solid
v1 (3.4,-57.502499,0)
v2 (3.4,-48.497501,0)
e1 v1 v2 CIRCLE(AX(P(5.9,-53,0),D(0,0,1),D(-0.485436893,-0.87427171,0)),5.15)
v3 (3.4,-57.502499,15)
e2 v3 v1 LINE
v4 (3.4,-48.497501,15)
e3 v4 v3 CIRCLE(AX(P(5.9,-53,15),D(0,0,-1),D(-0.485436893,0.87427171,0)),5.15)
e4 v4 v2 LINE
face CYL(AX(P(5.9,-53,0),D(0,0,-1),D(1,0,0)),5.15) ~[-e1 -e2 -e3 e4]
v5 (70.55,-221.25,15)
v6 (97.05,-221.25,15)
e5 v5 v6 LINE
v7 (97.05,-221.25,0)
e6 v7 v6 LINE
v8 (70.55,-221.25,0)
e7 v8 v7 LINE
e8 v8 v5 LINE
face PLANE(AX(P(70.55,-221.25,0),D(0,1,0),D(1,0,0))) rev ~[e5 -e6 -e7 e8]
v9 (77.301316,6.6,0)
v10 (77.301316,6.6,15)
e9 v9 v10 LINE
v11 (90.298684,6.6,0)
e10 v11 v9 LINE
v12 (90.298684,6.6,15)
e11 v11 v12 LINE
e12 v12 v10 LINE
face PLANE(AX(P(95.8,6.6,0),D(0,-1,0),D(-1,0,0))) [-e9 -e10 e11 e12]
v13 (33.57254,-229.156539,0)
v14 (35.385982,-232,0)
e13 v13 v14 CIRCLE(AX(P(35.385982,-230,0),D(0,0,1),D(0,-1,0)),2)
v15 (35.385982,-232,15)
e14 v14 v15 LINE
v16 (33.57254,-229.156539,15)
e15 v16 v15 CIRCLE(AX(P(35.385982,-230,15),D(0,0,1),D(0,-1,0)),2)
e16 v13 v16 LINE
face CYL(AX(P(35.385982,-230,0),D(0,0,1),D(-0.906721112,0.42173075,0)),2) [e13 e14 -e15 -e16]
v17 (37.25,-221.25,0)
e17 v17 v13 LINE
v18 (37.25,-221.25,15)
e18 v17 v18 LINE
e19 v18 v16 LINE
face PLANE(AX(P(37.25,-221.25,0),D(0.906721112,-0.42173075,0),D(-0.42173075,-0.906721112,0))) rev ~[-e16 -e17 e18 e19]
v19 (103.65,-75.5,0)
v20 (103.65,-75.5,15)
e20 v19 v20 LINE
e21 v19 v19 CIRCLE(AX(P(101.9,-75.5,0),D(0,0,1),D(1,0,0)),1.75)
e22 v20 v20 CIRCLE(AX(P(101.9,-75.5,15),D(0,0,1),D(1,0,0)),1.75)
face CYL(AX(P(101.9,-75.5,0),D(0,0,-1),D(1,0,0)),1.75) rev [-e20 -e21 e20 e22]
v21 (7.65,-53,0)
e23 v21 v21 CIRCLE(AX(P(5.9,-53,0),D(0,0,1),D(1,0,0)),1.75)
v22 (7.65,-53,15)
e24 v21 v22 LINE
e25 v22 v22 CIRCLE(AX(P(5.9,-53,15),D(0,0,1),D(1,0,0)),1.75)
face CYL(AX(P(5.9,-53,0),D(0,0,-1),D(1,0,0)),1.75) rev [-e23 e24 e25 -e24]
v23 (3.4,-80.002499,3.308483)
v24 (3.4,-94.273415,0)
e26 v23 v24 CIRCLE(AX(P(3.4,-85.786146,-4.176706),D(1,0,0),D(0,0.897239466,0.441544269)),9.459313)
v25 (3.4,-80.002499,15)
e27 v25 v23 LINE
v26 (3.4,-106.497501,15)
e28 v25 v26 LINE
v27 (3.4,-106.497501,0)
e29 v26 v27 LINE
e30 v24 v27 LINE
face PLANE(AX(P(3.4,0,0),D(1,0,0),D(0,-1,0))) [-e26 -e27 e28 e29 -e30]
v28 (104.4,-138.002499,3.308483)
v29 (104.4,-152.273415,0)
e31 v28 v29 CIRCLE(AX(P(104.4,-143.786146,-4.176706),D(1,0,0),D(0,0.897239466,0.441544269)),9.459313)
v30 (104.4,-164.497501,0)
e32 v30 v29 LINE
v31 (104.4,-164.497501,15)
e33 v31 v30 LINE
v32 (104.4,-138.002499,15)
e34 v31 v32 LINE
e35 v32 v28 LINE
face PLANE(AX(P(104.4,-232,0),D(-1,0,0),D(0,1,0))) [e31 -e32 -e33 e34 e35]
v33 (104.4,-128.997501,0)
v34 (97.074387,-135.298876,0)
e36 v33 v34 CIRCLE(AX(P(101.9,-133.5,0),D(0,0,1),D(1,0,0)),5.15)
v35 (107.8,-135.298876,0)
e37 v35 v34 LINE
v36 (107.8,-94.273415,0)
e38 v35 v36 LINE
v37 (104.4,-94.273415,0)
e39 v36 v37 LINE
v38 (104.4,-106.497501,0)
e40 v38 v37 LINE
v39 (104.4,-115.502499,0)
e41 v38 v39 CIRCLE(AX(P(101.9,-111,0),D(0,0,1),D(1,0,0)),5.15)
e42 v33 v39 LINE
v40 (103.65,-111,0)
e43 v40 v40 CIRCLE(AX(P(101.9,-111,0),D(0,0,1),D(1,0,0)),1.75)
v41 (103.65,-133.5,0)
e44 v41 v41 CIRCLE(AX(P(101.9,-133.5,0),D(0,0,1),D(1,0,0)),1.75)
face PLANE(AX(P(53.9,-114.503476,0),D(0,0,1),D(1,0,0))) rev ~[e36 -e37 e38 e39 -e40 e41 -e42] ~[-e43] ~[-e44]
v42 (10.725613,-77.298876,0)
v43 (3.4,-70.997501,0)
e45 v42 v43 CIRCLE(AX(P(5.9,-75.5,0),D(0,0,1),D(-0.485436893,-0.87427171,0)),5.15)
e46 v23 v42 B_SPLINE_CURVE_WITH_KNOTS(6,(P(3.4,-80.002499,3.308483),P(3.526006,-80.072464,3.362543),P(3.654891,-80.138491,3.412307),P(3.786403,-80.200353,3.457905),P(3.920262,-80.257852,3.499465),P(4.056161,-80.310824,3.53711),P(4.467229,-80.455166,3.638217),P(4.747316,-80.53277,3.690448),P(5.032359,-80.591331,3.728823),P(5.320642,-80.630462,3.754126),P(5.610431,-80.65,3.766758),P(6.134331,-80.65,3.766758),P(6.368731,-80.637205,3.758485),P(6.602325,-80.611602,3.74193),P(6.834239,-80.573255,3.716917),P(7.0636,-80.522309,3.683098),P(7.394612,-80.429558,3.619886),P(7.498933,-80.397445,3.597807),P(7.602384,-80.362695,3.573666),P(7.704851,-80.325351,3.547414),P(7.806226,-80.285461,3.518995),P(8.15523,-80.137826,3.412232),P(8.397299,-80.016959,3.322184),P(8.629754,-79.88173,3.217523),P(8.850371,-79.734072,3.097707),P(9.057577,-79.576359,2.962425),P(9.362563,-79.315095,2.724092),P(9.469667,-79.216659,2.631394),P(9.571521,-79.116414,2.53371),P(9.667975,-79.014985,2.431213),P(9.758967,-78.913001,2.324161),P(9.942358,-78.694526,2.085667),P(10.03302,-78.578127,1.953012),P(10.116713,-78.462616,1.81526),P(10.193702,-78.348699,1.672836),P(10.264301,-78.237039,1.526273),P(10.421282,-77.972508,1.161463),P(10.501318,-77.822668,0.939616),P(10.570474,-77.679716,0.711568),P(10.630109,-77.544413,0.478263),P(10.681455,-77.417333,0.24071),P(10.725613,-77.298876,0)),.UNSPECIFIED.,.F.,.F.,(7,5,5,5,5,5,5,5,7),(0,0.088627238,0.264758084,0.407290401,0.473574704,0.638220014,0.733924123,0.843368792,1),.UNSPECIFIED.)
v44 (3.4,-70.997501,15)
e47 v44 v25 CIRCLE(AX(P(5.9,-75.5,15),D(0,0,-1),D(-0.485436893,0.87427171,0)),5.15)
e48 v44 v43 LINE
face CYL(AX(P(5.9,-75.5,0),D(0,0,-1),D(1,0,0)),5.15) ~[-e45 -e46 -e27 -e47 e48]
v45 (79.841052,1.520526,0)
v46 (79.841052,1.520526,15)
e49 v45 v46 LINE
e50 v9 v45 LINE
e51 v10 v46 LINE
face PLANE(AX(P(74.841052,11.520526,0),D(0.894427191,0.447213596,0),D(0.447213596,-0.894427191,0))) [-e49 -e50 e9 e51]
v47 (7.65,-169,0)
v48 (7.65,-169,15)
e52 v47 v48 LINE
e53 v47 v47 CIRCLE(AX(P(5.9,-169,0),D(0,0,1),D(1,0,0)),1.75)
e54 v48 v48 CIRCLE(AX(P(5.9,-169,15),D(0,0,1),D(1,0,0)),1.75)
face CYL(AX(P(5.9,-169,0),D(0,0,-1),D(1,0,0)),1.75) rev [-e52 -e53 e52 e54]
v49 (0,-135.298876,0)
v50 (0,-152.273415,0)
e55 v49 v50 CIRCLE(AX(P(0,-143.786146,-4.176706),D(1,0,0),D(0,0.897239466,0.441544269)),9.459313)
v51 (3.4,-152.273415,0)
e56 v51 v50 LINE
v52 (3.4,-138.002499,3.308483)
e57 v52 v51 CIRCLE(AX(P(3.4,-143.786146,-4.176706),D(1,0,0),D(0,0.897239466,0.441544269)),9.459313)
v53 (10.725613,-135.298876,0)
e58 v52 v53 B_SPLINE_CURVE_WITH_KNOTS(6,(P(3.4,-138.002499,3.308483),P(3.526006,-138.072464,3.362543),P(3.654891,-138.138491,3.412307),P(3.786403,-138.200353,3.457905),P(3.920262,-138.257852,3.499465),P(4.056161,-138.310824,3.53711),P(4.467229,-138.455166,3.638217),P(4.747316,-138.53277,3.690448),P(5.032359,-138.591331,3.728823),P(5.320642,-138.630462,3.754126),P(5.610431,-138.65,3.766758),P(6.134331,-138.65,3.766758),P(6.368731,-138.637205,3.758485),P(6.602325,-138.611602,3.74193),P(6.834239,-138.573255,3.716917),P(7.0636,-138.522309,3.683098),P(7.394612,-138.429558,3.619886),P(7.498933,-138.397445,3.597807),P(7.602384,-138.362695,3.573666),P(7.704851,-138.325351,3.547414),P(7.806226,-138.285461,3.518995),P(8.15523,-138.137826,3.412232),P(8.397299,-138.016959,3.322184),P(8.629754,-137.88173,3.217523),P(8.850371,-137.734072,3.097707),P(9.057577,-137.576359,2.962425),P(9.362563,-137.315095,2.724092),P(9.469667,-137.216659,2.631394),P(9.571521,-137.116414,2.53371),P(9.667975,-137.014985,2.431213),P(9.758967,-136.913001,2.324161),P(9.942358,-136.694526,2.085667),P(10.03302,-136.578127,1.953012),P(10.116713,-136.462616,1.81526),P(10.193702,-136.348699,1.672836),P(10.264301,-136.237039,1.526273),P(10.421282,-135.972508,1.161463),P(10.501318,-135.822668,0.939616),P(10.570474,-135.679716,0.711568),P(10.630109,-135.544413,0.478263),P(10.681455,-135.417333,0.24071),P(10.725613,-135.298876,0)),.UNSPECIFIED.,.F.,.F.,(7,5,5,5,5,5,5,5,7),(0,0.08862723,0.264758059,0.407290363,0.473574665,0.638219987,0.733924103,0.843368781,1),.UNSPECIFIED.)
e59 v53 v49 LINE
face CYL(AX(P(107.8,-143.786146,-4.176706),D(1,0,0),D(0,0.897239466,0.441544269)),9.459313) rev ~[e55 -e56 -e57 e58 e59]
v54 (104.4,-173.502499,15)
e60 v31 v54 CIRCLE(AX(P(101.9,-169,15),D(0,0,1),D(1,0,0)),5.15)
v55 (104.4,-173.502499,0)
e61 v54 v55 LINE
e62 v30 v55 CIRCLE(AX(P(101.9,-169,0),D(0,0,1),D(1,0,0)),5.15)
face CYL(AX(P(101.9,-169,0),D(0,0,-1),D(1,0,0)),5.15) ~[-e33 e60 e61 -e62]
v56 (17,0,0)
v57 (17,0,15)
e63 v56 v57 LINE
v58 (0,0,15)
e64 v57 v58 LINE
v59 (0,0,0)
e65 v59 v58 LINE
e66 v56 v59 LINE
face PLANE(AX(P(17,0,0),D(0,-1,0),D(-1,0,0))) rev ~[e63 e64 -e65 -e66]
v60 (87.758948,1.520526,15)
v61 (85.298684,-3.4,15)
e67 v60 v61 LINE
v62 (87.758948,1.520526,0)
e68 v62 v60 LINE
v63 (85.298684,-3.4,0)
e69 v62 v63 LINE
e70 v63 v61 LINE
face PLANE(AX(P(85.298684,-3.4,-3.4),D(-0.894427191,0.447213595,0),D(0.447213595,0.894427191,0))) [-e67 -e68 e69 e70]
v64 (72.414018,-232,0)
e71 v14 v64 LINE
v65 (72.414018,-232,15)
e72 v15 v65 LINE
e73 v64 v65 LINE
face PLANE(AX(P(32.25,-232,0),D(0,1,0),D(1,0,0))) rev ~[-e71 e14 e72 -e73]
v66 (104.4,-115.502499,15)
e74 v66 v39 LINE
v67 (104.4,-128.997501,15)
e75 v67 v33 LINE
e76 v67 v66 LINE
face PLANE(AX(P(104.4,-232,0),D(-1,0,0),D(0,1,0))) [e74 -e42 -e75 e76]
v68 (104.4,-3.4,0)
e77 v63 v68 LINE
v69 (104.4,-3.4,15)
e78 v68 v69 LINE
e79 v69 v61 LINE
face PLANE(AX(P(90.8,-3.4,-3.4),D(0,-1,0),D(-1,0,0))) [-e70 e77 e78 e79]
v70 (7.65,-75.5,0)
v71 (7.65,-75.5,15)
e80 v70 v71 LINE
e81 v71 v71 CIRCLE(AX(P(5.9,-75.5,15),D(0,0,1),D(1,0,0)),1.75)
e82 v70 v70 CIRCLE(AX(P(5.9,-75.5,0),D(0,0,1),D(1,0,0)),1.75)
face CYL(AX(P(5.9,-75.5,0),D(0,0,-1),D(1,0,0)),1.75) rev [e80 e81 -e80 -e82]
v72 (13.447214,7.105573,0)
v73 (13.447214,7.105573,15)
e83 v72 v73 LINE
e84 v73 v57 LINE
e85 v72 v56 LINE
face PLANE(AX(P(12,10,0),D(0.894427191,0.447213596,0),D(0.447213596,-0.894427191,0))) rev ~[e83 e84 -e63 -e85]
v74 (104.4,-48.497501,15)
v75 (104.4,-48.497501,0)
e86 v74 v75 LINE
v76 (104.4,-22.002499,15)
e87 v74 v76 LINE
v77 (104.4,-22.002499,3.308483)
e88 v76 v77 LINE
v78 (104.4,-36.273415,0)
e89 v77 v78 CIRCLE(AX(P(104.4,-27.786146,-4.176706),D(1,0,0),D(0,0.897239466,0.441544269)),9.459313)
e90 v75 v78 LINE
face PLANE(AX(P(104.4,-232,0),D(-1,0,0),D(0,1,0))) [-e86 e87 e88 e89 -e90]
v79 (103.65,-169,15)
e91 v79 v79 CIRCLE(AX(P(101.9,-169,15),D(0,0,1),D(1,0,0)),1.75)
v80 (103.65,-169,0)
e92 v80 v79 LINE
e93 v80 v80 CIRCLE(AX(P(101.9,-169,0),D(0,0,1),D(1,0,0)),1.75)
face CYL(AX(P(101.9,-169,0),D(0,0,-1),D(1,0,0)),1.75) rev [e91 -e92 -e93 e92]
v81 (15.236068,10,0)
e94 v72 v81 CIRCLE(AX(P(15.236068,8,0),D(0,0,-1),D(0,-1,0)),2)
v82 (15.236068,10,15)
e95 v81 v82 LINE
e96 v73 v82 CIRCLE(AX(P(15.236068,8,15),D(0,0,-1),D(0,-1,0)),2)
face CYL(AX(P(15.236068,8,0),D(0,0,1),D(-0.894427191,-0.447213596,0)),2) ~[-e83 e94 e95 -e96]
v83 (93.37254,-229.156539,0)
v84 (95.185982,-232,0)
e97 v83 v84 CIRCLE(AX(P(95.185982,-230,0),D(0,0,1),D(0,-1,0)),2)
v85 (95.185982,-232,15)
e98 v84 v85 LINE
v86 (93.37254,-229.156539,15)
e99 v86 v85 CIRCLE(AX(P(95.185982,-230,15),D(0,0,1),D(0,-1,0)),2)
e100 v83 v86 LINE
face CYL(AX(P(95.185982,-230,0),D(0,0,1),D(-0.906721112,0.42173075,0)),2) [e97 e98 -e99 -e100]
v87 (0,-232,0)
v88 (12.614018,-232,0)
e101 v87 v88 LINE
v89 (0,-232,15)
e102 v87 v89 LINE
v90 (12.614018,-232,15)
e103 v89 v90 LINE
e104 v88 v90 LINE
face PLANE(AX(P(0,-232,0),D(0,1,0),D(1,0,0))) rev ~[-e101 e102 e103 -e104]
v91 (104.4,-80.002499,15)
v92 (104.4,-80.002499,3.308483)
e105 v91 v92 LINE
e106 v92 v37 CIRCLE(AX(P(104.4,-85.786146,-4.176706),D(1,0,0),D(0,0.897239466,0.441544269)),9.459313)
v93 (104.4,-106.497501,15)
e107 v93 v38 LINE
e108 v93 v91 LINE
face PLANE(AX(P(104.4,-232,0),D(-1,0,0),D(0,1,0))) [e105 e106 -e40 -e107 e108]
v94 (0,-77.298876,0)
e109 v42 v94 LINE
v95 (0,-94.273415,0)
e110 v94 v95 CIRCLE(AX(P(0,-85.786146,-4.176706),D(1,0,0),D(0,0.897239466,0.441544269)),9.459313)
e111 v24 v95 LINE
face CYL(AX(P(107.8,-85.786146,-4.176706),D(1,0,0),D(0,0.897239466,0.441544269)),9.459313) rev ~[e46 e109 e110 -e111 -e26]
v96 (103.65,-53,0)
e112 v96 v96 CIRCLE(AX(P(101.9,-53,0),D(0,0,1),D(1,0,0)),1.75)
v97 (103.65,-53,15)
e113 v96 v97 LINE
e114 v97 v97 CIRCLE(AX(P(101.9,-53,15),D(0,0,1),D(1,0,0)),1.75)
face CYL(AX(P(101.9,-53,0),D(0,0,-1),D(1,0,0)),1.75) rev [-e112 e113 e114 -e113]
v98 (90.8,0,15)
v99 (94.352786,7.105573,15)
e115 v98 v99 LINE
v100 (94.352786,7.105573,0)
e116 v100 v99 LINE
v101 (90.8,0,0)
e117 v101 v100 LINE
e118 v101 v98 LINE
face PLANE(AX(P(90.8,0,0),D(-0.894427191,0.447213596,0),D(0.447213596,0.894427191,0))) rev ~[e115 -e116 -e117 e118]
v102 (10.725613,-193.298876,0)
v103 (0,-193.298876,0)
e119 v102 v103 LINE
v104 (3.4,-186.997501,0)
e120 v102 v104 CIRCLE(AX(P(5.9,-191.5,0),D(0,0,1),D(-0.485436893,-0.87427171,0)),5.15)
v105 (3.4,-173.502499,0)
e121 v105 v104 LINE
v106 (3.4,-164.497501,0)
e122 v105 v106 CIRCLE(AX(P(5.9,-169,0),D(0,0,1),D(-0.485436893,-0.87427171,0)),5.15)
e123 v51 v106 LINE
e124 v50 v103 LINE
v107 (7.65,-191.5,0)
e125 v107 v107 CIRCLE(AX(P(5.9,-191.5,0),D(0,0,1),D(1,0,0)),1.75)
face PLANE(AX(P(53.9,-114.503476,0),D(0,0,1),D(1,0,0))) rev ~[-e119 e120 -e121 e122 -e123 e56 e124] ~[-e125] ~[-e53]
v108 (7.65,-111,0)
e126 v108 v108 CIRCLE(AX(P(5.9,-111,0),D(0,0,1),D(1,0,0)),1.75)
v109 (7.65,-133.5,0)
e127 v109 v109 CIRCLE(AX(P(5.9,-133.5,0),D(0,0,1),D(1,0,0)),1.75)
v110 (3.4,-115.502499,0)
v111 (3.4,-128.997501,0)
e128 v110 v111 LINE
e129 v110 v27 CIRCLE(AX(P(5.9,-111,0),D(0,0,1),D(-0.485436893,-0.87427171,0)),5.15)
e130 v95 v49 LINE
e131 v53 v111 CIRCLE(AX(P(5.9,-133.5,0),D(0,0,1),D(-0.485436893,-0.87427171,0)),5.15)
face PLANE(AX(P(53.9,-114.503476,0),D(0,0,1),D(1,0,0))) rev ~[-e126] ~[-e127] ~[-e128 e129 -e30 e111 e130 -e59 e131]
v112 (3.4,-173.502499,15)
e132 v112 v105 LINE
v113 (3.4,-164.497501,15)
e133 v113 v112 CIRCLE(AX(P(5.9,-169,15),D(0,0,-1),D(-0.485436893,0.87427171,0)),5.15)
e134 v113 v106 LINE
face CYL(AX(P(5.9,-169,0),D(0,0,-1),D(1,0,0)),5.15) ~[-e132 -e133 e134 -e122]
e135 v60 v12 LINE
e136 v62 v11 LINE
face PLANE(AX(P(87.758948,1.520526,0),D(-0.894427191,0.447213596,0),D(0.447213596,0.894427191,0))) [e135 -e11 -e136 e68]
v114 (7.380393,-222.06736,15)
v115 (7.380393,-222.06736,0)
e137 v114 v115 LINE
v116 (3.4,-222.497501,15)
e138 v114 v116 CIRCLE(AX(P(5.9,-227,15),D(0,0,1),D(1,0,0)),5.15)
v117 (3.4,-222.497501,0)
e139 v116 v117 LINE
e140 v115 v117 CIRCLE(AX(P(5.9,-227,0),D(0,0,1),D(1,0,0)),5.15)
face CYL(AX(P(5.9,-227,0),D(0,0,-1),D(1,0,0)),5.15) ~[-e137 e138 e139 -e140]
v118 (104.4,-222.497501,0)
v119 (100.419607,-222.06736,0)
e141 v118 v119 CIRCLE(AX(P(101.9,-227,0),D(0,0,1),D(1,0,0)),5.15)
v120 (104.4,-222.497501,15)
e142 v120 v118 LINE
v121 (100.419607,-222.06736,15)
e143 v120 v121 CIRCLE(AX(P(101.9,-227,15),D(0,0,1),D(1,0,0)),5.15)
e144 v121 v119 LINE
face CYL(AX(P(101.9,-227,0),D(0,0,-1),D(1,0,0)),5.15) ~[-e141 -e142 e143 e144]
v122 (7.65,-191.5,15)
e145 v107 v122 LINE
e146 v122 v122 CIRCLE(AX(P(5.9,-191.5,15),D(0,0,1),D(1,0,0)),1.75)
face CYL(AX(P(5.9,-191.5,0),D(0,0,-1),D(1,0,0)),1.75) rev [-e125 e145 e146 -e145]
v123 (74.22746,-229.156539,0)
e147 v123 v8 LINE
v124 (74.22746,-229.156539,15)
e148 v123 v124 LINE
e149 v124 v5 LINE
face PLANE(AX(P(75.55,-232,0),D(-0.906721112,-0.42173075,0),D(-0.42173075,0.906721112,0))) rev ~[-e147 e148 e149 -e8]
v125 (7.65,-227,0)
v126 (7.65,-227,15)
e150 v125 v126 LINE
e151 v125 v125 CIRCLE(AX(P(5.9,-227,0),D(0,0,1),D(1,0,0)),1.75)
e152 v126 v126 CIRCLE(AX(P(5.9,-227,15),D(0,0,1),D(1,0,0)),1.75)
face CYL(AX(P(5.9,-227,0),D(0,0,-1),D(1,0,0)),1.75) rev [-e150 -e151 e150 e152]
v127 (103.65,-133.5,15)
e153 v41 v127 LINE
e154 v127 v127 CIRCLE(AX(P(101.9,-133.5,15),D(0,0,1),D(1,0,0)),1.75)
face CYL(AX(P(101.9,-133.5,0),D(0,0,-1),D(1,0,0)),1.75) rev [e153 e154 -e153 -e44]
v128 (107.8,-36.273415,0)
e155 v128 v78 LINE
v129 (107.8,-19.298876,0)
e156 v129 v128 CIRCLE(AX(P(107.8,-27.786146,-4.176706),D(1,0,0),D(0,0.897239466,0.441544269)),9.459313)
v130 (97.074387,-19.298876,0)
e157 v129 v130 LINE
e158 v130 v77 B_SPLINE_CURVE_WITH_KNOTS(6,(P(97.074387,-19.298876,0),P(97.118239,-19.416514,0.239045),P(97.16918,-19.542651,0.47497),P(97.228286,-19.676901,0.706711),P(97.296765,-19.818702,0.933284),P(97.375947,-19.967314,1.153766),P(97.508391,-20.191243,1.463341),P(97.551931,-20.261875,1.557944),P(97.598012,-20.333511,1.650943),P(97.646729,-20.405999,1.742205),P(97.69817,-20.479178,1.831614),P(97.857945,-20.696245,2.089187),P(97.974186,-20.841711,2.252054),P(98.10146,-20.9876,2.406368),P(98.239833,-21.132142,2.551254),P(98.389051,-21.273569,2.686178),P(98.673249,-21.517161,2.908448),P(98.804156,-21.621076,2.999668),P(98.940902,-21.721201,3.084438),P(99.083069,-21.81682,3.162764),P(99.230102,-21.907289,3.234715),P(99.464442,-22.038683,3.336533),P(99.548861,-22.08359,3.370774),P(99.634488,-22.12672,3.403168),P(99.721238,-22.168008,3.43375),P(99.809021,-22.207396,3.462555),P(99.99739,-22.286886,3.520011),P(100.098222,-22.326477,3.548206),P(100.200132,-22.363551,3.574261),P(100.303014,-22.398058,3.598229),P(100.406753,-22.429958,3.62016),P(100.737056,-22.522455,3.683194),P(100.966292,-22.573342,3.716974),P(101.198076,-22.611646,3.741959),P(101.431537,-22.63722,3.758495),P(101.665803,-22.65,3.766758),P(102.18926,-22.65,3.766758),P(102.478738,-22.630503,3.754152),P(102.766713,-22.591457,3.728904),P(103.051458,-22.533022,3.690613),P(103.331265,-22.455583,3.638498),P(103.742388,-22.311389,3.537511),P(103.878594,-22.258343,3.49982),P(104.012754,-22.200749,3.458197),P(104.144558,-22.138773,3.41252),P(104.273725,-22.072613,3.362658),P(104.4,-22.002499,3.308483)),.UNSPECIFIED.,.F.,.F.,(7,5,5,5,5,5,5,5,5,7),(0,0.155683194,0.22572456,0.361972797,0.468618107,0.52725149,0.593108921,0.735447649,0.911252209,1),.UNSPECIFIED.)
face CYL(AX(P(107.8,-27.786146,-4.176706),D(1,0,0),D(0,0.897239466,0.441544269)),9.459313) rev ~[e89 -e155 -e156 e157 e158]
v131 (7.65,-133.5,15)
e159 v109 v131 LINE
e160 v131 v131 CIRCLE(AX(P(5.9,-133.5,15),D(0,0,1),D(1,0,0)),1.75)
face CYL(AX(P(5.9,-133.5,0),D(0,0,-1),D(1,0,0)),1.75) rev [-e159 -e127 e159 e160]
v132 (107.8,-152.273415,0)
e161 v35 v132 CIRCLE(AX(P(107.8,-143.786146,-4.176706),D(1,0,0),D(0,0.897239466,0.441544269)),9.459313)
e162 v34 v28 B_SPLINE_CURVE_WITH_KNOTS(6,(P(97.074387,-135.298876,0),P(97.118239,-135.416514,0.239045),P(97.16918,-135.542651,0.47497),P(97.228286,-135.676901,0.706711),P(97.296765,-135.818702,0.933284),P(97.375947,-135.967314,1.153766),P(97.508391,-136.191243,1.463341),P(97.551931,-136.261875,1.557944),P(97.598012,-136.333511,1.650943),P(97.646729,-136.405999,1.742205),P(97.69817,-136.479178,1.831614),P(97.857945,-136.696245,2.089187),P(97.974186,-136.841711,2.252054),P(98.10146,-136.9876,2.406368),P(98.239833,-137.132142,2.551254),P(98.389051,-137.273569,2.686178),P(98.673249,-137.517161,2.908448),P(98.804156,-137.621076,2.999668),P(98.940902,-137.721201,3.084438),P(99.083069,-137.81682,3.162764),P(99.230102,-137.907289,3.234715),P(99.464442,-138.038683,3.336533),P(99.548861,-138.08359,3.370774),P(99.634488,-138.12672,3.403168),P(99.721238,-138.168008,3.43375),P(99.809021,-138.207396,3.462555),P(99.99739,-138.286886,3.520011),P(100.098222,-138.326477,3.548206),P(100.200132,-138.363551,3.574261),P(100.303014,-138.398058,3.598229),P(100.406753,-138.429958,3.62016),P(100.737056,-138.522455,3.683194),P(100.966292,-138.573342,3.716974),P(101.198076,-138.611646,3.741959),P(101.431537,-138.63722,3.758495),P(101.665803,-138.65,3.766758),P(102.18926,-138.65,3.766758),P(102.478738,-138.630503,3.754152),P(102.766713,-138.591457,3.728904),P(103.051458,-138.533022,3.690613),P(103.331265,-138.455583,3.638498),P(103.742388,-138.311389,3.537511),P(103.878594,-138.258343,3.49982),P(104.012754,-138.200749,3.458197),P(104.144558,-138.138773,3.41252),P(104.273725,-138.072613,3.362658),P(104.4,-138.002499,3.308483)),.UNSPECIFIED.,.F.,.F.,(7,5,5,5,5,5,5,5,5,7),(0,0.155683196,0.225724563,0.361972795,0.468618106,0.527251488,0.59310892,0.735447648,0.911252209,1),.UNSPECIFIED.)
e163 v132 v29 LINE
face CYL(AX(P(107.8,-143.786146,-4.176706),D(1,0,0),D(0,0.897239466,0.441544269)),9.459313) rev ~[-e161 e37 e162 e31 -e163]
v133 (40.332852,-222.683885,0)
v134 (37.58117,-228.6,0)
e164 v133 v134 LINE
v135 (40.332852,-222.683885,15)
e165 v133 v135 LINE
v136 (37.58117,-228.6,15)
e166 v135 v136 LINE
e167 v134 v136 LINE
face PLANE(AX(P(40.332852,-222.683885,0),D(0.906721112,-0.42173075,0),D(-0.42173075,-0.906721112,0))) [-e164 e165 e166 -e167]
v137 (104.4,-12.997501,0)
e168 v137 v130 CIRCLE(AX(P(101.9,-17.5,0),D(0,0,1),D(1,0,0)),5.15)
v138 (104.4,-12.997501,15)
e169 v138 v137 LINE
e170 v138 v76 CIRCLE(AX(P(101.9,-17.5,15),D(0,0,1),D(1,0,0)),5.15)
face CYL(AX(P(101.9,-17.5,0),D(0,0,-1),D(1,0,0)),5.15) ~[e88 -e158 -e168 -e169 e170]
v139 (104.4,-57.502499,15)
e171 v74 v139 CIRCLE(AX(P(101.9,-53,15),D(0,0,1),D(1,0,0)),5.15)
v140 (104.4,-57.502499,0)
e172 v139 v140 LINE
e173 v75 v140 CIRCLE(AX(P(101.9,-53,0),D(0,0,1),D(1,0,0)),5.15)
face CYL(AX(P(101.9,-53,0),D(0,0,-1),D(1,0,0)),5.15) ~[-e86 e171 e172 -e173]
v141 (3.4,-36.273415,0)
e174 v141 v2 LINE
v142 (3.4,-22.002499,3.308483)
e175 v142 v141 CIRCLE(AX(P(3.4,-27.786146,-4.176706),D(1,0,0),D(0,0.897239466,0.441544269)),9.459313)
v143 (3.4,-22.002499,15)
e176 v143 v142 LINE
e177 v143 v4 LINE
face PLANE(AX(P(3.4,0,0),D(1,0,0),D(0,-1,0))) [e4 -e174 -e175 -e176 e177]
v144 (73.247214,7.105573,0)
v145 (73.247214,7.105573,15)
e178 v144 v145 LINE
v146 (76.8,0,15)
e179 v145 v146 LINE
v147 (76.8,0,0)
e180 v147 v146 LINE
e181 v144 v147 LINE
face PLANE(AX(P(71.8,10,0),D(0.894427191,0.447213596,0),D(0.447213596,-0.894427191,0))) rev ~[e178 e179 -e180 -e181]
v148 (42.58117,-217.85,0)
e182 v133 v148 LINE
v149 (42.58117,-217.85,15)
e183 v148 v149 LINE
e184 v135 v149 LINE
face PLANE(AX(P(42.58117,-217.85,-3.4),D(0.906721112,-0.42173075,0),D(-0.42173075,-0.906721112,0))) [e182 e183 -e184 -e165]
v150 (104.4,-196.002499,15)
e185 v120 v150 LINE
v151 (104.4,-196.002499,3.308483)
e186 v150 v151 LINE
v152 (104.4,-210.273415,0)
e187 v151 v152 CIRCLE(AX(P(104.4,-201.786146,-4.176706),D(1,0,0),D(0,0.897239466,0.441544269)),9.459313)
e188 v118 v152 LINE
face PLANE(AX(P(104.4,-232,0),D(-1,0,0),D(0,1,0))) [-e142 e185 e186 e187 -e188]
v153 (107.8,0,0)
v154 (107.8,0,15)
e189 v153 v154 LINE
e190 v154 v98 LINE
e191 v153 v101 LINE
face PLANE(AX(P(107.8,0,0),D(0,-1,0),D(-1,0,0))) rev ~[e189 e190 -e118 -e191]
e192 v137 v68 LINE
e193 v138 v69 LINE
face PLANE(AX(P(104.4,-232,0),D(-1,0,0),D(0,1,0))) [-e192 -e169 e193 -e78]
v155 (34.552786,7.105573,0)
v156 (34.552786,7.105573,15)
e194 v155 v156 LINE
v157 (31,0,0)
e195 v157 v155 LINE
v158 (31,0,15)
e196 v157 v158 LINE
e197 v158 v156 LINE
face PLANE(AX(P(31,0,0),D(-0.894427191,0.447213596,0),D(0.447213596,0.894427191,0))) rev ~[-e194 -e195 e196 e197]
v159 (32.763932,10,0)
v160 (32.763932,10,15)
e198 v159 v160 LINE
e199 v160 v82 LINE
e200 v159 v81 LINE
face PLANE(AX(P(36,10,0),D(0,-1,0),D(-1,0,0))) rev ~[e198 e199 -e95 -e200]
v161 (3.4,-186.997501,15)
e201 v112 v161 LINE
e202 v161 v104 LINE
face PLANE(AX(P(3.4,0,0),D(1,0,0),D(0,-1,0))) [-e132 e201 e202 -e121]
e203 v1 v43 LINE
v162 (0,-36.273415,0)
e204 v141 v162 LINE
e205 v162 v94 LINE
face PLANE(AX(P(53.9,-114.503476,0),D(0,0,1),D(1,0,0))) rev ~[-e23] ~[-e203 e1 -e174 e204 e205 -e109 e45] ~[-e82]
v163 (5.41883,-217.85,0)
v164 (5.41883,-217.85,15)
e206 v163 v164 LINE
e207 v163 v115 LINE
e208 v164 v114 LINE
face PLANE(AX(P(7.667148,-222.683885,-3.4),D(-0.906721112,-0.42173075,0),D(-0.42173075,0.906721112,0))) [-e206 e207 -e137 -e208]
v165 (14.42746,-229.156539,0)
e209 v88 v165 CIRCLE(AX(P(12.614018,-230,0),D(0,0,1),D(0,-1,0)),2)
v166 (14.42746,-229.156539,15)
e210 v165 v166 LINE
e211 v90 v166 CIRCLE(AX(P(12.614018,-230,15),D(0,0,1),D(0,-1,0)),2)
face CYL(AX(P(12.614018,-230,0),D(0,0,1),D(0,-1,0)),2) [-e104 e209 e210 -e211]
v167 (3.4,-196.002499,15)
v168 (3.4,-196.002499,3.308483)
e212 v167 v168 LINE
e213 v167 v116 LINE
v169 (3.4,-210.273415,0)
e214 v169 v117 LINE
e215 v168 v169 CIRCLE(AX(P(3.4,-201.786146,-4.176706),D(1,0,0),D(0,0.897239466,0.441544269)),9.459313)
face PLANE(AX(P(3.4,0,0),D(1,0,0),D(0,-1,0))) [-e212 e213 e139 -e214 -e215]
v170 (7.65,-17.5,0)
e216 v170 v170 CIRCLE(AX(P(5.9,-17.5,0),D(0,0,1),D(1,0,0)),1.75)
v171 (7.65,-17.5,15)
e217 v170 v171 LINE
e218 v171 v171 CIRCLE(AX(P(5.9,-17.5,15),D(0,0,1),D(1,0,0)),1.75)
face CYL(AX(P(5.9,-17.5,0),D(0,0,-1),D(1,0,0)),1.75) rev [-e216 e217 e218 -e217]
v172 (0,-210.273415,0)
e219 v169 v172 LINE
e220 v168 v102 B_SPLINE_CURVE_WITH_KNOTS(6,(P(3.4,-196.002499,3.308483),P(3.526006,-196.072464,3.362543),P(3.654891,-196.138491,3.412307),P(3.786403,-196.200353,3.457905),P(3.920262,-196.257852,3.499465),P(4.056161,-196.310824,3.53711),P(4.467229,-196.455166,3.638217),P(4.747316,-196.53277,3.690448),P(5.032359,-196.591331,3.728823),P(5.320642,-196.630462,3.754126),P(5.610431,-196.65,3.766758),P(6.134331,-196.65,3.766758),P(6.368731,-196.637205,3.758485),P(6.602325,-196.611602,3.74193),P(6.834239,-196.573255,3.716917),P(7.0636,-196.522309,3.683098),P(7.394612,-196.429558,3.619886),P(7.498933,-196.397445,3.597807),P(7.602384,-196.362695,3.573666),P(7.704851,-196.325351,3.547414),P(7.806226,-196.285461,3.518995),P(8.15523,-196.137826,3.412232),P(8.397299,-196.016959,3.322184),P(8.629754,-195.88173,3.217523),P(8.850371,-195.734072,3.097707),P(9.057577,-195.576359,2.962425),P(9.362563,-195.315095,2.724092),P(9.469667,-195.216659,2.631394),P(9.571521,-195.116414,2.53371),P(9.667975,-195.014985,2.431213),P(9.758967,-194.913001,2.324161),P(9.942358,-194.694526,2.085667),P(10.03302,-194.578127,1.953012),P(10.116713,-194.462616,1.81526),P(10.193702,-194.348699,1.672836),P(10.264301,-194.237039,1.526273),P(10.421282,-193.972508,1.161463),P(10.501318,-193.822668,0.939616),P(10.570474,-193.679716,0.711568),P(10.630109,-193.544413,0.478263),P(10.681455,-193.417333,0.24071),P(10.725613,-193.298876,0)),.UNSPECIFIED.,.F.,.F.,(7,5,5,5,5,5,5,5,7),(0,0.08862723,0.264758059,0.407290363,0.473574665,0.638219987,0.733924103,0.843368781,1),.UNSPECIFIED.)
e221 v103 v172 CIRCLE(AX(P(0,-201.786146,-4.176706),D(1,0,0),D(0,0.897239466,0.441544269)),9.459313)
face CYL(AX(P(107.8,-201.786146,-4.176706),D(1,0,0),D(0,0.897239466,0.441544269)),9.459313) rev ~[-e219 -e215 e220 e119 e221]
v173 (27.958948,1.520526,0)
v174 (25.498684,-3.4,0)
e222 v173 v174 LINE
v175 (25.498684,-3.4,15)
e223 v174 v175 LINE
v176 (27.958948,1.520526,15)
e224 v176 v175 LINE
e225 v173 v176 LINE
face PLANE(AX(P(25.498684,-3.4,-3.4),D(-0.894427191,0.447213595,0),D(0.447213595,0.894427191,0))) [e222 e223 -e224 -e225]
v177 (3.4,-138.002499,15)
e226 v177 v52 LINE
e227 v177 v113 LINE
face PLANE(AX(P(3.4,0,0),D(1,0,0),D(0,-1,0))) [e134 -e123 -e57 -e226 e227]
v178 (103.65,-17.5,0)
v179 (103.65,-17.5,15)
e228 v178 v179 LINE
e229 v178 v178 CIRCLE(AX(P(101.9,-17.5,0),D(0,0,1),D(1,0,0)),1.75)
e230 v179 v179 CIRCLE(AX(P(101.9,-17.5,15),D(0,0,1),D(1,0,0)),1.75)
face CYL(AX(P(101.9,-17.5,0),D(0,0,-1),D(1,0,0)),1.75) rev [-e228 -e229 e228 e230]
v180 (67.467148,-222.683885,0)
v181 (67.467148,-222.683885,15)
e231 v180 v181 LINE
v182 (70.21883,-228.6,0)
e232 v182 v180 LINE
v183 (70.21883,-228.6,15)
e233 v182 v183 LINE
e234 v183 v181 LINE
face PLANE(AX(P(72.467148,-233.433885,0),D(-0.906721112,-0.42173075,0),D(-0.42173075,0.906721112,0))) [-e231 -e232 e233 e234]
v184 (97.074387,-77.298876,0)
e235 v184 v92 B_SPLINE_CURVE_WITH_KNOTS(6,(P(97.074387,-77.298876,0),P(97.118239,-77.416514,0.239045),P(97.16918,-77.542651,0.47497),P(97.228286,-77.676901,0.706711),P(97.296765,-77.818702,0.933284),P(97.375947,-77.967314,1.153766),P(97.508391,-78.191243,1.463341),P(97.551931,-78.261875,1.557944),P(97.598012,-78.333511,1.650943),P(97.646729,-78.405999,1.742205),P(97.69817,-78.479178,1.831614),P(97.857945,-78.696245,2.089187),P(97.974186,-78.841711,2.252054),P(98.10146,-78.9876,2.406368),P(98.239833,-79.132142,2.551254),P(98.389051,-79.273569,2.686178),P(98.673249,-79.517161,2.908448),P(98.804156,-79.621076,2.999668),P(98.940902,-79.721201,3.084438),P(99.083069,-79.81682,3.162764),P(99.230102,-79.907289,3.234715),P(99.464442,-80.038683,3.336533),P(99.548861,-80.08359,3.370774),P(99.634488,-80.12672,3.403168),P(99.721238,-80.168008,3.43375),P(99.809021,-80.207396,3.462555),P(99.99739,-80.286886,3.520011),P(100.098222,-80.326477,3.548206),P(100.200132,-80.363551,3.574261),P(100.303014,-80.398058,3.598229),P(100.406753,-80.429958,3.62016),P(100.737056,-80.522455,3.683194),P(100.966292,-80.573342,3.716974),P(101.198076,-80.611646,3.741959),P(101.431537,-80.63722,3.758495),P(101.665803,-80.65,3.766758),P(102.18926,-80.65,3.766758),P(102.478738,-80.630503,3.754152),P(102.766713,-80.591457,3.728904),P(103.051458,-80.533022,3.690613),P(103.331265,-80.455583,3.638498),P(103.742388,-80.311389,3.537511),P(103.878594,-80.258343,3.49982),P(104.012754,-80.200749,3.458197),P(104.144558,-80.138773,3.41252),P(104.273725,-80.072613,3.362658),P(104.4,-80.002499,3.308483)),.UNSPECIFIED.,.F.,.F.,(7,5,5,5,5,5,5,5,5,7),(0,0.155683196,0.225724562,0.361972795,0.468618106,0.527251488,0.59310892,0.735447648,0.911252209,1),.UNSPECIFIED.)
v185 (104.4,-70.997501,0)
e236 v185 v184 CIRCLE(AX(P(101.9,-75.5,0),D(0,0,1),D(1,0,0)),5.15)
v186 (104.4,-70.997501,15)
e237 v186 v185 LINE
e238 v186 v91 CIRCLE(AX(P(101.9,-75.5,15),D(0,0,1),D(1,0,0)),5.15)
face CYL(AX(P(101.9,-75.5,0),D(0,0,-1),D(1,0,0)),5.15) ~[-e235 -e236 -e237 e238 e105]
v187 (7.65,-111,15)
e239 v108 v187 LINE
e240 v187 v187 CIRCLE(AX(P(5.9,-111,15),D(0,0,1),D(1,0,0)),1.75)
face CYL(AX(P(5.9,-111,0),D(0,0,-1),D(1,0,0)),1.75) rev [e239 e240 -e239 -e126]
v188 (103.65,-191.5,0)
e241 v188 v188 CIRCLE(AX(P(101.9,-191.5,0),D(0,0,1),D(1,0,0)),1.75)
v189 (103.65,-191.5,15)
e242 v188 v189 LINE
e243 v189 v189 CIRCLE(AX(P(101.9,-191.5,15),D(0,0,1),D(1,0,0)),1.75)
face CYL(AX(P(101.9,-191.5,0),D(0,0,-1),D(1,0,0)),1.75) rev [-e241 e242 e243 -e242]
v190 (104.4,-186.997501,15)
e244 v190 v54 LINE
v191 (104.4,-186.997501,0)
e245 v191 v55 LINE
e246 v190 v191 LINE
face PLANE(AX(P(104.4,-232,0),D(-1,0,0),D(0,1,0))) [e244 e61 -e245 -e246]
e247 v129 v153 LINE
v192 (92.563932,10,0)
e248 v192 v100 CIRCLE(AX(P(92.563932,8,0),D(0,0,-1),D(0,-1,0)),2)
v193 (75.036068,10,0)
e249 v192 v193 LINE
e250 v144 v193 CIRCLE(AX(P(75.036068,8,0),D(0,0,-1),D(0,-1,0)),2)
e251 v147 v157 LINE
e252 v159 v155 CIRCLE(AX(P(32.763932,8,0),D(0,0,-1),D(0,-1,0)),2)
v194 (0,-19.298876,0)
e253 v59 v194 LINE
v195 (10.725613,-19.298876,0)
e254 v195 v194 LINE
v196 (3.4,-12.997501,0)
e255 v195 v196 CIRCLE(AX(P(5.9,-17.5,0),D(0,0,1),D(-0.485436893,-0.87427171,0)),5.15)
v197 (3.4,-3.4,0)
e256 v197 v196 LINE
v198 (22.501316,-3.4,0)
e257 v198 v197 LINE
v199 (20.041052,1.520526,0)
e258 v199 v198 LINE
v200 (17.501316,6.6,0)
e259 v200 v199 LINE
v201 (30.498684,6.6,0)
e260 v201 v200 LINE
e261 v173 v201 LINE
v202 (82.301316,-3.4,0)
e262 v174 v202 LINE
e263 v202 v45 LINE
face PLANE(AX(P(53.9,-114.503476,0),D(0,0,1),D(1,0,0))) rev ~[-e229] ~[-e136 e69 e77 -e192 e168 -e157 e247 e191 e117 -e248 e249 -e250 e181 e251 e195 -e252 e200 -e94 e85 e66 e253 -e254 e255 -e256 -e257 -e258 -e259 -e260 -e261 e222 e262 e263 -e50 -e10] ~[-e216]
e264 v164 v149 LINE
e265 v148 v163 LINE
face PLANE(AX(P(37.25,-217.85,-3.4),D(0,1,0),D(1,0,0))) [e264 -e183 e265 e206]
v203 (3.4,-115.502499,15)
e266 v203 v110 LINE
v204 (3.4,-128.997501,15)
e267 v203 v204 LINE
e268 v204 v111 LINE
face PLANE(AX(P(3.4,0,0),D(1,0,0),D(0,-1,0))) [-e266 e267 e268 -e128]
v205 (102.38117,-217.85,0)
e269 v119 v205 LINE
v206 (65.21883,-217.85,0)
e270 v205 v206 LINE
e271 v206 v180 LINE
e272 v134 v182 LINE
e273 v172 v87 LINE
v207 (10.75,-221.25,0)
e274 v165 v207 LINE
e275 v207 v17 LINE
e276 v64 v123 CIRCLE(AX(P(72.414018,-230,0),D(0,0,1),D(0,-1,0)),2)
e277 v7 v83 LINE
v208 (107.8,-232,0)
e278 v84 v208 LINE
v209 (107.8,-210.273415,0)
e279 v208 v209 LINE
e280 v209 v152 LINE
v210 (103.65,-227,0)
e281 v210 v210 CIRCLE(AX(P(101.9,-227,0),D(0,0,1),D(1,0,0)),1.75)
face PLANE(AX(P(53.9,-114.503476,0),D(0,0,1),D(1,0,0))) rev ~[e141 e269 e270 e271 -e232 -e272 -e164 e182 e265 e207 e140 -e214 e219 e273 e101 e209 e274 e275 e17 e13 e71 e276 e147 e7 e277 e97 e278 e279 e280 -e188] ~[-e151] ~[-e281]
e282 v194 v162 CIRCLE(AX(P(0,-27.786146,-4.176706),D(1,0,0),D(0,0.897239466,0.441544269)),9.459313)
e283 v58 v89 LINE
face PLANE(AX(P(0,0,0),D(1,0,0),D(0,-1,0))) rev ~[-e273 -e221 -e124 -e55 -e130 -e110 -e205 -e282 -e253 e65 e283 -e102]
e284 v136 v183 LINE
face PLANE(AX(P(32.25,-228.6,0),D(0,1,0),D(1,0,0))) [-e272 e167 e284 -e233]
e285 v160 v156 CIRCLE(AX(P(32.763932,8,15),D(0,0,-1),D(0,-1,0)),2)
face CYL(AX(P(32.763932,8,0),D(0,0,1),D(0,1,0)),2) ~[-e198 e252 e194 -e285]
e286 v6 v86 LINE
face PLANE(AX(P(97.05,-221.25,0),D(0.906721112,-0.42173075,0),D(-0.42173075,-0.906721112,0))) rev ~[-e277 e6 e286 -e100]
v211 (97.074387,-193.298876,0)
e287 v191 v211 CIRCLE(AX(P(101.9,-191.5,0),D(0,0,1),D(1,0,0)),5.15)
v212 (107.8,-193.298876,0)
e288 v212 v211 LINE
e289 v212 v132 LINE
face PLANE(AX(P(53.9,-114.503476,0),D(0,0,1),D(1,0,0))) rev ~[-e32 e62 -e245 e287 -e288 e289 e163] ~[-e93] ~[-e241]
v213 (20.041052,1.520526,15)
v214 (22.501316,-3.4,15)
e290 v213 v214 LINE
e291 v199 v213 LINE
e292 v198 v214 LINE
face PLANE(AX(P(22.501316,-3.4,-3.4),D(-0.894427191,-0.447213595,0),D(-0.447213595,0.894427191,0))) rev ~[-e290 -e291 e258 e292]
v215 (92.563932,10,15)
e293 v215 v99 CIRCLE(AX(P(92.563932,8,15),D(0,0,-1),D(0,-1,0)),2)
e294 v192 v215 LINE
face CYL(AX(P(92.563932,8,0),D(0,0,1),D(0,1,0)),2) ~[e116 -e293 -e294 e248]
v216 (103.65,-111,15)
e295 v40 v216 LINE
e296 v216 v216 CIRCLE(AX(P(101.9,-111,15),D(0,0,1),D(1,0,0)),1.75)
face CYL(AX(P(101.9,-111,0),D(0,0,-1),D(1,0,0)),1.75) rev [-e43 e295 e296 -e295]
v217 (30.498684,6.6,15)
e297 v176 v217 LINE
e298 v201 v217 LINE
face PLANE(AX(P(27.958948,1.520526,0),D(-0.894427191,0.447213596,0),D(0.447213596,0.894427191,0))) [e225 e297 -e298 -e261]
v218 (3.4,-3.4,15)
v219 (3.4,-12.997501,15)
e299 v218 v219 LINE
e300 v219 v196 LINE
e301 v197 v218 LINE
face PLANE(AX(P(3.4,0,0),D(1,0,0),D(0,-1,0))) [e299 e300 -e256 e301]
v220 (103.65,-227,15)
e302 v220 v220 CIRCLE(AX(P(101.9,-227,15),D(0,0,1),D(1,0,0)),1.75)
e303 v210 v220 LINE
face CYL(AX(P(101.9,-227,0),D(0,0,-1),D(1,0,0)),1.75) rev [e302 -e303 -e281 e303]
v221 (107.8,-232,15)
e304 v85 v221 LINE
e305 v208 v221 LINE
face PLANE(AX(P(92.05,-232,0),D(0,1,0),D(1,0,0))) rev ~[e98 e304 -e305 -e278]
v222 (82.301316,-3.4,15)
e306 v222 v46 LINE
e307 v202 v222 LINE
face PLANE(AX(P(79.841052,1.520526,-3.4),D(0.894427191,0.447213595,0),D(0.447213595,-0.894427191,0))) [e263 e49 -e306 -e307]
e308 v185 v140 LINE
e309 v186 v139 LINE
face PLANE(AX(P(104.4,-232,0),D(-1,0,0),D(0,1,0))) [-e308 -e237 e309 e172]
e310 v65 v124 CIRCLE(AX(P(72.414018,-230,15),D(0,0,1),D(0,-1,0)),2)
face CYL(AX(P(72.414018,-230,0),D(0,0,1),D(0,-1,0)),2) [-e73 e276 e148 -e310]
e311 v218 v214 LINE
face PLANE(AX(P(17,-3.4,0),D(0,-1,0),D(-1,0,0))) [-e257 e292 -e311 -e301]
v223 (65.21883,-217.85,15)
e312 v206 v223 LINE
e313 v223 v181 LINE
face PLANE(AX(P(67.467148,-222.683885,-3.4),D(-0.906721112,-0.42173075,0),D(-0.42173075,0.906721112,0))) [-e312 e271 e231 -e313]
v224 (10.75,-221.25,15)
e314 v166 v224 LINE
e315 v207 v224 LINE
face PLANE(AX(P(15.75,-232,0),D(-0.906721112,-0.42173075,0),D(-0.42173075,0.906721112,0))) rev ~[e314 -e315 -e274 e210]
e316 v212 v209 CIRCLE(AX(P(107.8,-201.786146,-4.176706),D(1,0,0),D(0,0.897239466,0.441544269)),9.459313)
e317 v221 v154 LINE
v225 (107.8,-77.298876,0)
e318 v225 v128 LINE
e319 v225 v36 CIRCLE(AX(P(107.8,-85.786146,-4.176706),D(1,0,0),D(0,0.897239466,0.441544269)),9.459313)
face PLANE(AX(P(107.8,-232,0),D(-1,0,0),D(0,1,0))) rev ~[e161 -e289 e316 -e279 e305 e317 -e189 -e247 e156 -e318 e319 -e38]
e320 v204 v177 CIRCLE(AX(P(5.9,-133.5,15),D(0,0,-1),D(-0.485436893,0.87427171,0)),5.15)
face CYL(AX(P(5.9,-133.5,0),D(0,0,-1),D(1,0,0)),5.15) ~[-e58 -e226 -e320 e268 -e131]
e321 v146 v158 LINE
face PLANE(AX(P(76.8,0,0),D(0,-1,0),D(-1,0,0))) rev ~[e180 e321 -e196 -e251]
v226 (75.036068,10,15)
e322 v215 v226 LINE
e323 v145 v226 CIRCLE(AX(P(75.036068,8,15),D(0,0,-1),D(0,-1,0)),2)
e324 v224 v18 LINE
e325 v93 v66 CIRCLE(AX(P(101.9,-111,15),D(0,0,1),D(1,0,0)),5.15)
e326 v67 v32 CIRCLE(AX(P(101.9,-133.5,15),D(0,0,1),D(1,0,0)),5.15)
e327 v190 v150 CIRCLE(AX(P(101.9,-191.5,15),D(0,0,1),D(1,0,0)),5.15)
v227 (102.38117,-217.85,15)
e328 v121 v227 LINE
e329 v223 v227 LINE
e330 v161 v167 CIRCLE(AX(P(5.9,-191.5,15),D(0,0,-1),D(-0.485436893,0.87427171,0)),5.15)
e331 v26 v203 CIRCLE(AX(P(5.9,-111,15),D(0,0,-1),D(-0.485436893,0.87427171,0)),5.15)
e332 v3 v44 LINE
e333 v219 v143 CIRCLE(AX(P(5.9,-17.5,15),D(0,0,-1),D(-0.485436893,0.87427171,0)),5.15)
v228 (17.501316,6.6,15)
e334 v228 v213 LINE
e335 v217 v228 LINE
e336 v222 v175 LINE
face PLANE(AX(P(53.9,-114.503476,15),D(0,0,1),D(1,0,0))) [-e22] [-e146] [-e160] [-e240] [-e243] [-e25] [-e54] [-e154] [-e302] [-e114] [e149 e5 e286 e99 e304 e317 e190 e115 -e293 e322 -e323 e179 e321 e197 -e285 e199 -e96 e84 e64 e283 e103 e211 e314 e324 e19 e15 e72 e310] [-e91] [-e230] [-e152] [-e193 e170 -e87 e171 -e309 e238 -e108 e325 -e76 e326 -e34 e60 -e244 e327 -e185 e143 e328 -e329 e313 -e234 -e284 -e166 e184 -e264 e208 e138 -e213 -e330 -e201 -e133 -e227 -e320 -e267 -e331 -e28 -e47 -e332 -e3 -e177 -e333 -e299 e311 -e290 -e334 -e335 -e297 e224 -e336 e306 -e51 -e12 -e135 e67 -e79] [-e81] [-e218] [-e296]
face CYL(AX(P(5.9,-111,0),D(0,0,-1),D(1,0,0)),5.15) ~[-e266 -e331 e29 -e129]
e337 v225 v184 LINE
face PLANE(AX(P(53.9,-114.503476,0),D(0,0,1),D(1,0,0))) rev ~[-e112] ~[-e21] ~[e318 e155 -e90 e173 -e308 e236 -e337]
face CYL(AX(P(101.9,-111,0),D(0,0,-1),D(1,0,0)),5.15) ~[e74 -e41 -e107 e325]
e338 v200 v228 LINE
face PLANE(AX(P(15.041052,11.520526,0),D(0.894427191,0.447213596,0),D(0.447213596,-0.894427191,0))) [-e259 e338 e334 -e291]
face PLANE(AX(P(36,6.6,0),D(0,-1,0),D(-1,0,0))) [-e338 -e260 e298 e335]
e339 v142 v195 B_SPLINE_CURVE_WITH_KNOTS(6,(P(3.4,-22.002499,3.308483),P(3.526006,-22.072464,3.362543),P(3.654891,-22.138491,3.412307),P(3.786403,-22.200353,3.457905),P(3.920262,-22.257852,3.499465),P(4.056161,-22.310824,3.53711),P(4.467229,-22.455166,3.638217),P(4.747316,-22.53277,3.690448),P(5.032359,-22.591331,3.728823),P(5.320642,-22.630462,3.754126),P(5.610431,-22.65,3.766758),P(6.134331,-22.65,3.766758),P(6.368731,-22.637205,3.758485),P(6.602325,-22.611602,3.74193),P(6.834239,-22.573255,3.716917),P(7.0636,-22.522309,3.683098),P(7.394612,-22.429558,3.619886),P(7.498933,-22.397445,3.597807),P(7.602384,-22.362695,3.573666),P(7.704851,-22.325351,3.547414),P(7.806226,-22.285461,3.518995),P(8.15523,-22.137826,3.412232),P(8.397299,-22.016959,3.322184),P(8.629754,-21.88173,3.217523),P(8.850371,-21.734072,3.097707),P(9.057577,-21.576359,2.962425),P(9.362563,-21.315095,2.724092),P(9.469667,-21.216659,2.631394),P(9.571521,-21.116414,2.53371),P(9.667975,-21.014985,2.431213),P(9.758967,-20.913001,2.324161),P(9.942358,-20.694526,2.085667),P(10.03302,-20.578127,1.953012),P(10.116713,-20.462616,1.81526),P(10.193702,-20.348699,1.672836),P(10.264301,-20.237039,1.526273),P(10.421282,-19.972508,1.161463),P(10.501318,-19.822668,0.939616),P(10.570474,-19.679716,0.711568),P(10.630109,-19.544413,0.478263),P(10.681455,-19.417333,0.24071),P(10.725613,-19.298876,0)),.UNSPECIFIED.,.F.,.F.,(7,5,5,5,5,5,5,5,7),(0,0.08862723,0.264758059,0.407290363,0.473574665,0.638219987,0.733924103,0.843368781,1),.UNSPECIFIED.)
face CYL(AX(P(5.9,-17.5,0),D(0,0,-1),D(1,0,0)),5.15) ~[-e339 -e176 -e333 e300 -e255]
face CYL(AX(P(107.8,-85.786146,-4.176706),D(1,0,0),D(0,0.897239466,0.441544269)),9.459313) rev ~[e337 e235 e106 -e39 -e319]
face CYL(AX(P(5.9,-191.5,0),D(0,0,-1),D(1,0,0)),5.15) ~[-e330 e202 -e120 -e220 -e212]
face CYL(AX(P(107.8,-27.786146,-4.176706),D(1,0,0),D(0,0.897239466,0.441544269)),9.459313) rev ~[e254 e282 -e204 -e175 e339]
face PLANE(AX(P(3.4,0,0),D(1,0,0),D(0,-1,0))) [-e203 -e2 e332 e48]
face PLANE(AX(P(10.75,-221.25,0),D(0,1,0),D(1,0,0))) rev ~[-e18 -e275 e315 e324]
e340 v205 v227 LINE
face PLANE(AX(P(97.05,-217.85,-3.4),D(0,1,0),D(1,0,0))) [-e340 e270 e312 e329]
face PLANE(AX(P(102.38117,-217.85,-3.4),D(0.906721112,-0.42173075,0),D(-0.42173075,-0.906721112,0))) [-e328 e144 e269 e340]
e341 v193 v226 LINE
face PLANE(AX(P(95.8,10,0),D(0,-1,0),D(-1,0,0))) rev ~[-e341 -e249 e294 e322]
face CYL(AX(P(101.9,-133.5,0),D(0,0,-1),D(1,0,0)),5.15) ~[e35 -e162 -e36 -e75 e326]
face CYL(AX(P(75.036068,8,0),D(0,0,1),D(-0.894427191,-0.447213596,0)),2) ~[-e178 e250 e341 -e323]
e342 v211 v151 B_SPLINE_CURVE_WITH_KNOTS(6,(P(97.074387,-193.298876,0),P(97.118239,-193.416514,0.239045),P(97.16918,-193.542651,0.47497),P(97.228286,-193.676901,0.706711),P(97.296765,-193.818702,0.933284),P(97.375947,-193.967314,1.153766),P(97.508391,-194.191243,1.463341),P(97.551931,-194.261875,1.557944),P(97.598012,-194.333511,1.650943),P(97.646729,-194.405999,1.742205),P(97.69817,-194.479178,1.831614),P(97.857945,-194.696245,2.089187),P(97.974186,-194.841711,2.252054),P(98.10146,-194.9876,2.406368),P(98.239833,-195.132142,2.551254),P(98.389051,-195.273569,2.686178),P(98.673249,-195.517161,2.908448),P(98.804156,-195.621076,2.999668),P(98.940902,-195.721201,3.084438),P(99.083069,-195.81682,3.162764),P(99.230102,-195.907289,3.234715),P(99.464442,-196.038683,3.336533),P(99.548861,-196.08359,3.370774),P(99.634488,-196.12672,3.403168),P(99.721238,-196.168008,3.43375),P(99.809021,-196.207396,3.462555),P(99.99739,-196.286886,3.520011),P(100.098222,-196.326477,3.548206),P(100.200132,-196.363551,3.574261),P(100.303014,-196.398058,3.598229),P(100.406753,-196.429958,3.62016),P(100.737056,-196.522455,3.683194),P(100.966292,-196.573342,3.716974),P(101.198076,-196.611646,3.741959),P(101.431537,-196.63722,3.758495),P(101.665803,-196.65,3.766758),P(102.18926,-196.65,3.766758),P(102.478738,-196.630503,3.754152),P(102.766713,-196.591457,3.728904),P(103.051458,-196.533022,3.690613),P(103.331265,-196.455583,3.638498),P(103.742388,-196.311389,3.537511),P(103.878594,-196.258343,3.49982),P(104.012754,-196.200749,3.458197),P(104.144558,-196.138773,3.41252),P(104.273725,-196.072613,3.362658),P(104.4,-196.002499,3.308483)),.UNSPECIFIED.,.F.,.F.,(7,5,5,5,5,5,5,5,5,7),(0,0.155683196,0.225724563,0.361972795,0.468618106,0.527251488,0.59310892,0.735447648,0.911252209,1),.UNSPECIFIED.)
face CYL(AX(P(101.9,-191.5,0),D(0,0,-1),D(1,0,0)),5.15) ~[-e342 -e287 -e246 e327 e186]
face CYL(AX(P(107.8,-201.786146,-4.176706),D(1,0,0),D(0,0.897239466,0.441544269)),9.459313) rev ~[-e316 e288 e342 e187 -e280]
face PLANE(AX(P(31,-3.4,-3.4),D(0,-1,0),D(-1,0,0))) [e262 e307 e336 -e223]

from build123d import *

# Parameters (mm, degrees)
F0_R        = 1.75
F1_DEPTH    = 15
F2_T        = 3.4
F2_T3_DEPTH = 21.8
F3_R        = 2
F5_DEPTH    = 200


# Not quite as in the source:
# - a shell that OpenCascade refuses in one call is made with other operations: the cavity is built on its own and cut out


with BuildPart() as f1:
    # F0 (on Top) → F1 (new body)
    with BuildSketch(Plane.XY):
        Polygon((17, 0), (0, 0), (0, -232), (15.75, -232), (10.75, -221.25), (37.25, -221.25), (32.25, -232), (75.55, -232), (70.55, -221.25), (97.05, -221.25), (92.05, -232), (107.8, -232), (107.8, 0), (90.8, 0), (95.8, 10), (71.8, 10), (76.8, 0), (31, 0), (36, 10), (12, 10), align=None)
        with Locations((5.9, -227)):
            Circle(F0_R, mode=Mode.SUBTRACT)
        with Locations((5.9, -191.5)):
            Circle(F0_R, mode=Mode.SUBTRACT)
        with Locations((5.9, -169)):
            Circle(F0_R, mode=Mode.SUBTRACT)
        with Locations((5.9, -133.5)):
            Circle(F0_R, mode=Mode.SUBTRACT)
        with Locations((101.9, -227)):
            Circle(F0_R, mode=Mode.SUBTRACT)
        with Locations((101.9, -191.5)):
            Circle(F0_R, mode=Mode.SUBTRACT)
        with Locations((101.9, -169)):
            Circle(F0_R, mode=Mode.SUBTRACT)
        with Locations((101.9, -133.5)):
            Circle(F0_R, mode=Mode.SUBTRACT)
        with Locations((5.9, -111)):
            Circle(F0_R, mode=Mode.SUBTRACT)
        with Locations((5.9, -75.5)):
            Circle(F0_R, mode=Mode.SUBTRACT)
        with Locations((5.9, -53)):
            Circle(F0_R, mode=Mode.SUBTRACT)
        with Locations((5.9, -17.5)):
            Circle(F0_R, mode=Mode.SUBTRACT)
        with Locations((101.9, -111)):
            Circle(F0_R, mode=Mode.SUBTRACT)
        with Locations((101.9, -75.5)):
            Circle(F0_R, mode=Mode.SUBTRACT)
        with Locations((101.9, -53)):
            Circle(F0_R, mode=Mode.SUBTRACT)
        with Locations((101.9, -17.5)):
            Circle(F0_R, mode=Mode.SUBTRACT)
    extrude(amount=F1_DEPTH)

    # F2: shell of thickness 3.4, made by hand


with BuildPart() as f2_core1:
    # F2_t2: copy of F1
    add(f1.part)

    # the walls: a layer under each face that stays
    f2_faces = [f2_core1.faces().sort_by_distance(p)[0] for p in [
        (8.5, 0, 7.5),
        (0, -116, 7.5),
        (7.875, -232, 7.5),
        (13.25, -226.625, 7.5),
        (24, -221.25, 7.5),
        (34.75, -226.625, 7.5),
        (53.9, -232, 7.5),
        (73.05, -226.625, 7.5),
        (83.8, -221.25, 7.5),
        (94.55, -226.625, 7.5),
        (99.925, -232, 7.5),
        (107.8, -116, 7.5),
        (99.3, 0, 7.5),
        (93.3, 5, 7.5),
        (83.8, 10, 7.5),
        (74.3, 5, 7.5),
        (53.9, 0, 7.5),
        (33.5, 5, 7.5),
        (24, 10, 7.5),
        (14.5, 5, 7.5),
        (4.15, -227, 7.5),
        (4.15, -191.5, 7.5),
        (4.15, -169, 7.5),
        (4.15, -133.5, 7.5),
        (100.15, -227, 7.5),
        (100.15, -191.5, 7.5),
        (100.15, -169, 7.5),
        (100.15, -133.5, 7.5),
        (4.15, -111, 7.5),
        (4.15, -75.5, 7.5),
        (4.15, -53, 7.5),
        (4.15, -17.5, 7.5),
        (100.15, -111, 7.5),
        (100.15, -75.5, 7.5),
        (100.15, -53, 7.5),
        (100.15, -17.5, 7.5),
    ]]
    thicken(f2_faces, amount=-F2_T, mode=Mode.SUBTRACT)

    # F2_s4 → F2_t3 (cut)
    with BuildSketch(Plane.XY.offset(-3.4)):
        Polygon((16.9695894755, 0.0187947378), (17, -3.4), (22.5013155617, -3.4), (20.0410524494, 1.5205262247), align=None)
        Polygon((10.7808285178, -221.2696611545), (7.6671482196, -222.683884549), (5.4188298247, -217.85), (10.75, -217.85), align=None)
        Polygon((37.2191714822, -221.2696611545), (37.25, -217.85), (42.5811701753, -217.85), (40.3328517804, -222.683884549), align=None)
        Polygon((70.5808285178, -221.2696611545), (67.4671482196, -222.683884549), (65.2188298247, -217.85), (70.55, -217.85), align=None)
        Polygon((97.0191714822, -221.2696611545), (97.05, -217.85), (102.3811701753, -217.85), (100.1328517804, -222.683884549), align=None)
        Polygon((90.8304105245, 0.0187947378), (90.8, -3.4), (85.2986844383, -3.4), (87.7589475506, 1.5205262247), align=None)
        Polygon((76.7695894755, 0.0187947378), (79.8410524494, 1.5205262247), (82.3013155617, -3.4), (76.8, -3.4), align=None)
        Polygon((31.0304105245, 0.0187947378), (31, -3.4), (25.4986844383, -3.4), (27.9589475506, 1.5205262247), align=None)
    extrude(amount=F2_T3_DEPTH, mode=Mode.SUBTRACT)


with BuildPart() as f1_1:
    add(f1.part)

    # what is left inside the walls is the cavity
    f2_cavity = [f2_core1.part.solids().sort_by_distance(p)[0] for p in [
        (53.9, -150.2, 14.966),
    ]]
    add(f2_cavity, mode=Mode.SUBTRACT)

    # F3
    f3_edges = [f1_1.edges().sort_by_distance(p)[0] for p in [
        (15.75, -232, 7.5),
        (32.25, -232, 7.5),
        (75.55, -232, 7.5),
        (92.05, -232, 7.5),
        (12, 10, 7.5),
        (36, 10, 7.5),
        (71.8, 10, 7.5),
        (95.8, 10, 7.5),
    ]]
    fillet(f3_edges, radius=F3_R)

    # F4 (on face) → F5 (cut)
    with BuildSketch(Plane.YZ.offset(107.8)):
        with BuildLine():
            Line((-210.2734148502, 0), (-193.2988762856, 0))
            ThreePointArc((-193.2988762856, 0), (-201.7861455679, 5.2826077701), (-210.2734148502, 0))
        make_face()
        with BuildLine():
            ThreePointArc((-135.2988762856, 0), (-143.7861455679, 5.2826077701), (-152.2734148502, 0))
            Line((-152.2734148502, 0), (-135.2988762856, 0))
        make_face()
        with BuildLine():
            ThreePointArc((-77.2988762856, 0), (-85.7861455679, 5.2826077701), (-94.2734148502, 0))
            Line((-94.2734148502, 0), (-77.2988762856, 0))
        make_face()
        with BuildLine():
            ThreePointArc((-19.2988762856, 0), (-27.7861455679, 5.2826077701), (-36.2734148502, 0))
            Line((-36.2734148502, 0), (-19.2988762856, 0))
        make_face()
    extrude(amount=-F5_DEPTH, mode=Mode.SUBTRACT)


solid = f1_1.part
